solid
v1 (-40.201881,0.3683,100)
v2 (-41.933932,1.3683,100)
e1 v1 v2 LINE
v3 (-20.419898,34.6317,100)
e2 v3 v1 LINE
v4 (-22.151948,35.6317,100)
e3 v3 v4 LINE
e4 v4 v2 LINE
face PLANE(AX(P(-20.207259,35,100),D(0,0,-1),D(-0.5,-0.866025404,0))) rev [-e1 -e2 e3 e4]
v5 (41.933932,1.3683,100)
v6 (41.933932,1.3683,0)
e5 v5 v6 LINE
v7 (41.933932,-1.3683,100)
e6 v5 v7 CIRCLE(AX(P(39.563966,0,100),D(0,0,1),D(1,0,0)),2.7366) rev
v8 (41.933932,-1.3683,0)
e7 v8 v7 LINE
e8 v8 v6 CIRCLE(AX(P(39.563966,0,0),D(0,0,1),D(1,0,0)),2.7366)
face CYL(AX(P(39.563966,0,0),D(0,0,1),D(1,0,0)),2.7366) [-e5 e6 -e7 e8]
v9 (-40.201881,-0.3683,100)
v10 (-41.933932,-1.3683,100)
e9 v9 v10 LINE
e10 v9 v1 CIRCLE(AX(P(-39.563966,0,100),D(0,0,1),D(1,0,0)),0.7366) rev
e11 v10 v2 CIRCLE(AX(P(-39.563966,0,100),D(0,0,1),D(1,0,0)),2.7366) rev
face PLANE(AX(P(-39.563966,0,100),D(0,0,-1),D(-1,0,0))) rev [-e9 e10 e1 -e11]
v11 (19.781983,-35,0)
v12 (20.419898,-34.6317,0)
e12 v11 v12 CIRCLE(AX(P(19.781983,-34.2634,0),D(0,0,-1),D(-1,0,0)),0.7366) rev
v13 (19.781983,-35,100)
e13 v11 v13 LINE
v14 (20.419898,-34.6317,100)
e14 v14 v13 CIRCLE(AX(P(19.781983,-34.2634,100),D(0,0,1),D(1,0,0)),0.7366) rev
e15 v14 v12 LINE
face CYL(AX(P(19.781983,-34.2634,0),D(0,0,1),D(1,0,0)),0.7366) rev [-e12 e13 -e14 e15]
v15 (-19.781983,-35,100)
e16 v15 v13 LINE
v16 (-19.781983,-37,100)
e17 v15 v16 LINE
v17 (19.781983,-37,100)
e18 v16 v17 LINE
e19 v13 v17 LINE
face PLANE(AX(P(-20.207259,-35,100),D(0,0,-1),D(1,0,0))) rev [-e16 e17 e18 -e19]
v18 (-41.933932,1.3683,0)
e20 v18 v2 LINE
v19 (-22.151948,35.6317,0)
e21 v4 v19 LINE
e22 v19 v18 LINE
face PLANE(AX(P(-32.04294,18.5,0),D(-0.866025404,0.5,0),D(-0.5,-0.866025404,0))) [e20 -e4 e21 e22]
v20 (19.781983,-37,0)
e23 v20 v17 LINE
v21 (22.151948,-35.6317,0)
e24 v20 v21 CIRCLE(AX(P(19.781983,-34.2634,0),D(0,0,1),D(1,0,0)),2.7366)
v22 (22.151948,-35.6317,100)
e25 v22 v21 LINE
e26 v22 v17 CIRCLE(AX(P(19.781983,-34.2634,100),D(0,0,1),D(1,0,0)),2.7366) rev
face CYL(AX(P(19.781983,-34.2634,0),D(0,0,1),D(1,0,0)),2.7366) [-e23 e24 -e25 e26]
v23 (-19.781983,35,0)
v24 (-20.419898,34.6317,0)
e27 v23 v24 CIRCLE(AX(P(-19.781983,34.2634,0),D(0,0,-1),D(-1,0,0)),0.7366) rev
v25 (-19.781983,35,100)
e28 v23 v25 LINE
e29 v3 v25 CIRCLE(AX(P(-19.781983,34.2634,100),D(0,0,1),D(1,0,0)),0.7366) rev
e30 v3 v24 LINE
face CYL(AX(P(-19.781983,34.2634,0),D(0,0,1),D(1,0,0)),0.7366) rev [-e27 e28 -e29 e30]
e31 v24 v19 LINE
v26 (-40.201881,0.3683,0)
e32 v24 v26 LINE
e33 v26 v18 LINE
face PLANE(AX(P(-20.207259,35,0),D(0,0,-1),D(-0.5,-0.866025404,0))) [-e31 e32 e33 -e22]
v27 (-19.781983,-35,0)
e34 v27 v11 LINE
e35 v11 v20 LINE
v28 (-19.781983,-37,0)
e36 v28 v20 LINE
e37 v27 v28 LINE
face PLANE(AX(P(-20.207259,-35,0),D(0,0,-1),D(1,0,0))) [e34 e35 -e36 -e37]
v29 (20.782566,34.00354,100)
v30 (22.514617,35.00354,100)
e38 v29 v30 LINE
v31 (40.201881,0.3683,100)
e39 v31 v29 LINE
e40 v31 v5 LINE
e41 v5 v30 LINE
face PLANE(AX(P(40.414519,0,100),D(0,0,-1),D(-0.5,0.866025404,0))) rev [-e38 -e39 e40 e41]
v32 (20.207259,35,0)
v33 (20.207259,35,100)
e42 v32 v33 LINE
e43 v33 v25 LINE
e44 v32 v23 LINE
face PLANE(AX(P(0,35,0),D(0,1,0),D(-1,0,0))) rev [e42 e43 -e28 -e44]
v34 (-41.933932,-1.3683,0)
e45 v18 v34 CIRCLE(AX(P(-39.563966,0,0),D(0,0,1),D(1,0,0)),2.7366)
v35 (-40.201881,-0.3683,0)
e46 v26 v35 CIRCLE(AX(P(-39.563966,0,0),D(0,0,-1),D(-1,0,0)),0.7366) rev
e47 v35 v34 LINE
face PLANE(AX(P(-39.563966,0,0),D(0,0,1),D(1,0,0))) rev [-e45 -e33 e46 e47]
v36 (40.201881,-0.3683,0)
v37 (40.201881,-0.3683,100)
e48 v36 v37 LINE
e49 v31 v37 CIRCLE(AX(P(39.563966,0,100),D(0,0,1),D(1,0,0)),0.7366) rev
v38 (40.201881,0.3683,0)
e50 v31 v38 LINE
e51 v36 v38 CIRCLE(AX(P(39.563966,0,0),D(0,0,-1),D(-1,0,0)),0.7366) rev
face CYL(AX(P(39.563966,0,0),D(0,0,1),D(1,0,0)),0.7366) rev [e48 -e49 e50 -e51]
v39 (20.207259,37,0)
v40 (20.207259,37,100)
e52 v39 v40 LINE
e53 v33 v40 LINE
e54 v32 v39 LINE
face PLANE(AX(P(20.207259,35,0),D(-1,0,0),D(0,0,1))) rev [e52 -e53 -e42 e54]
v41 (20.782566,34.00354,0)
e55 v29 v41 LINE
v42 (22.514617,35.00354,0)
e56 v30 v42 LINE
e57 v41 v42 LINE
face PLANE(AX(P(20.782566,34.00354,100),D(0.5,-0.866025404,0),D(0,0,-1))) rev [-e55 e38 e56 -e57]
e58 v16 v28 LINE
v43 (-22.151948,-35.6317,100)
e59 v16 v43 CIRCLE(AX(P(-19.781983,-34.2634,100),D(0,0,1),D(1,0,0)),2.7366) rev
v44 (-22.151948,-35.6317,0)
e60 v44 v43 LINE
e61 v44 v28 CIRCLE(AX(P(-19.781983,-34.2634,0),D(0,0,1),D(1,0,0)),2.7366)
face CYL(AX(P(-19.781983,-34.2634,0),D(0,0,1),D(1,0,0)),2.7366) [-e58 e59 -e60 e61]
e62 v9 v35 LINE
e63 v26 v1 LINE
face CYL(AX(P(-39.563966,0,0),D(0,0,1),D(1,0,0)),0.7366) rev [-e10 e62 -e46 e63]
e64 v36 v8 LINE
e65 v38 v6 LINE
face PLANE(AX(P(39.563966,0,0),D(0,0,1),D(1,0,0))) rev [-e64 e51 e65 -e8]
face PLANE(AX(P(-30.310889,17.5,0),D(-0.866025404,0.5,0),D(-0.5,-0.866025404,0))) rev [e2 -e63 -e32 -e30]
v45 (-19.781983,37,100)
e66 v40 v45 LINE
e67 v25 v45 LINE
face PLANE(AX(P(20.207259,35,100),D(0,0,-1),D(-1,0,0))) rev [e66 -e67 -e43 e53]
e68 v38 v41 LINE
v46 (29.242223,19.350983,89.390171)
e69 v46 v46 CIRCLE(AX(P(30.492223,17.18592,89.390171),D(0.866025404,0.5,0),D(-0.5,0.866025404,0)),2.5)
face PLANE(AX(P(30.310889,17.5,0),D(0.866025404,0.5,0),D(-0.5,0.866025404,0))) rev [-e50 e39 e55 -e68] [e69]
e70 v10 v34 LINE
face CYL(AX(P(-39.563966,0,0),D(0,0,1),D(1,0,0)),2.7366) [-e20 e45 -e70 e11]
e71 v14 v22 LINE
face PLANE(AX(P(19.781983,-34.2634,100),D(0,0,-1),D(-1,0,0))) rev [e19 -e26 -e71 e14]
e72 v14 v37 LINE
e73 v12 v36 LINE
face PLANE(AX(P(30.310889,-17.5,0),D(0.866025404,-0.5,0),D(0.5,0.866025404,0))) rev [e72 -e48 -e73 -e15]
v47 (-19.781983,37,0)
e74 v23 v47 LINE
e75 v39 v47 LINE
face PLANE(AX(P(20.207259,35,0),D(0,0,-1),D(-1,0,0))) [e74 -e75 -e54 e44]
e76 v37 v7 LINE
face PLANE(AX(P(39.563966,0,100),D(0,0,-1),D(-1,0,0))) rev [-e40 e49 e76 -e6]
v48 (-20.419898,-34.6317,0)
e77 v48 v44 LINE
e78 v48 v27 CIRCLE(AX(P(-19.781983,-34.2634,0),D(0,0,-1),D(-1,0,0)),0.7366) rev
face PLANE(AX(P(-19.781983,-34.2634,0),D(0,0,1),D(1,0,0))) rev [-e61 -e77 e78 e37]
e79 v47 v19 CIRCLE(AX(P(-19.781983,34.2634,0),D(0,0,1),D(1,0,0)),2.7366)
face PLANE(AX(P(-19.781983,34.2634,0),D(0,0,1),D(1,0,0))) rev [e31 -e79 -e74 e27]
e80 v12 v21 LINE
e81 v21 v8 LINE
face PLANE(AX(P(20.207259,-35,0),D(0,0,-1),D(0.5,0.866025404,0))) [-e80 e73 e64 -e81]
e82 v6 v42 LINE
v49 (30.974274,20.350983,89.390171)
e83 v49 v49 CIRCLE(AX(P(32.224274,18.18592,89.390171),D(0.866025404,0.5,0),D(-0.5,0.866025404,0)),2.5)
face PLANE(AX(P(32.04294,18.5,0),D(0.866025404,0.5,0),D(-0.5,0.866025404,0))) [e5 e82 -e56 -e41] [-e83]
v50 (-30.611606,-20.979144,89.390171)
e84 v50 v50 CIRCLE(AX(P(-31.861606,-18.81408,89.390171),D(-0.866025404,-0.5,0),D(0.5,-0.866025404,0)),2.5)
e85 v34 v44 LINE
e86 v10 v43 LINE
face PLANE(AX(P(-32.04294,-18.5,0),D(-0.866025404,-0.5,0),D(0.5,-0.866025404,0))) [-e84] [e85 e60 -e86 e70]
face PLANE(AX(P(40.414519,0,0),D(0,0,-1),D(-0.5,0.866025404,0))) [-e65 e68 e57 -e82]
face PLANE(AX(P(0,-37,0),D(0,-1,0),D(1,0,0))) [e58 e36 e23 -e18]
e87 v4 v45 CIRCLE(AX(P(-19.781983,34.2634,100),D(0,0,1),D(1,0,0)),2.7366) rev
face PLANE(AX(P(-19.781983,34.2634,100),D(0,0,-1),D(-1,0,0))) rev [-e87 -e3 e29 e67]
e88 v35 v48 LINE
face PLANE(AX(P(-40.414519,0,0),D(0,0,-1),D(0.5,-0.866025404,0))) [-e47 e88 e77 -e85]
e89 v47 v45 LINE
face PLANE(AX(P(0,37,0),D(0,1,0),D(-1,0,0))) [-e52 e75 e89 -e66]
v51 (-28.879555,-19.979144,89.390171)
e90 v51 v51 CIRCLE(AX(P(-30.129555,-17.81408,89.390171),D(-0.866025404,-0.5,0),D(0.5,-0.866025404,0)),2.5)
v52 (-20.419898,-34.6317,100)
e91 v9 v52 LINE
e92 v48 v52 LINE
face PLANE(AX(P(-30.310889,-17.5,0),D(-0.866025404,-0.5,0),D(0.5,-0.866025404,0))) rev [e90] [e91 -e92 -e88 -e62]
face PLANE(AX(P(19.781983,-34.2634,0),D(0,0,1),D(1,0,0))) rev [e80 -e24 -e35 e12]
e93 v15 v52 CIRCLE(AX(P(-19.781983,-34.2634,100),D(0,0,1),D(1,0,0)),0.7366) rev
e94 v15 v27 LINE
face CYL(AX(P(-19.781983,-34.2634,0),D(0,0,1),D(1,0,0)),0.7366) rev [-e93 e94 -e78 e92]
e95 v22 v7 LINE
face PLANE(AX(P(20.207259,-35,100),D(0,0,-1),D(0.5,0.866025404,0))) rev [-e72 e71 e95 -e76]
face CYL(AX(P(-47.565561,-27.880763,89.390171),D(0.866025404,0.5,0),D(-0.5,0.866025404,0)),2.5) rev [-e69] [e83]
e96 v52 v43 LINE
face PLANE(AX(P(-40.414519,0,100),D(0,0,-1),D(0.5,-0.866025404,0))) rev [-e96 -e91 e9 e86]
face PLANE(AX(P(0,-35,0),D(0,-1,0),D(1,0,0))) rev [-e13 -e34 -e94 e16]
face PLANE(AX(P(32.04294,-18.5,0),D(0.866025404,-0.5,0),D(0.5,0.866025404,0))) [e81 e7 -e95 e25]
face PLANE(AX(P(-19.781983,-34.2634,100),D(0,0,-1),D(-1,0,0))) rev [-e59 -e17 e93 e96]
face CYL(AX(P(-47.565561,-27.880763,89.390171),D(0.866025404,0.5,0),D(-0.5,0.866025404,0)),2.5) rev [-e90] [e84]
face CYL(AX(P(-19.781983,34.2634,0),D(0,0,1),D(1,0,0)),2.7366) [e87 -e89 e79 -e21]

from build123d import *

# Parameters (mm, degrees)
LOFTED_BENDS1_DEPTH = 100
SKETCH11_R          = 2.5
CUT_EXTRUDE1_DEPTH  = 137.408236331


# Read off the part's stored shape, not the designer's step: Lofted Bends1
with BuildPart() as part:
    # Lofted Bends1 outline → Lofted Bends1 (new body)
    with BuildSketch(Plane.XY):
        with BuildLine():
            Line((20.207259422, 35), (20.207259422, 37))
            Line((20.207259422, 37), (-19.781983213, 37))
            ThreePointArc((-19.781983213, 37), (-21.150283213, 36.63336512), (-22.151948333, 35.6317))
            Line((-22.151948333, 35.6317), (-41.933931547, 1.3683))
            ThreePointArc((-41.933931547, 1.3683), (-42.300566427, 0), (-41.933931547, -1.3683))
            Line((-41.933931547, -1.3683), (-22.151948333, -35.6317))
            ThreePointArc((-22.151948333, -35.6317), (-21.150283213, -36.63336512), (-19.781983213, -37))
            Line((-19.781983213, -37), (19.781983213, -37))
            ThreePointArc((19.781983213, -37), (21.150283213, -36.63336512), (22.151948333, -35.6317))
            Line((22.151948333, -35.6317), (41.933931547, -1.3683))
            ThreePointArc((41.933931547, -1.3683), (42.300566427, 0), (41.933931547, 1.3683))
            Line((41.933931547, 1.3683), (22.514616839, 35.003539722))
            Line((22.514616839, 35.003539722), (20.782566032, 34.003539722))
            Line((20.782566032, 34.003539722), (40.201880739, 0.3683))
            ThreePointArc((40.201880739, 0.3683), (40.300566427, 0), (40.201880739, -0.3683))
            Line((40.201880739, -0.3683), (20.419897526, -34.6317))
            ThreePointArc((20.419897526, -34.6317), (20.150283213, -34.901314312), (19.781983213, -35))
            Line((19.781983213, -35), (-19.781983213, -35))
            ThreePointArc((-19.781983213, -35), (-20.150283213, -34.901314312), (-20.419897526, -34.6317))
            Line((-20.419897526, -34.6317), (-40.201880739, -0.3683))
            ThreePointArc((-40.201880739, -0.3683), (-40.300566427, 0), (-40.201880739, 0.3683))
            Line((-40.201880739, 0.3683), (-20.419897526, 34.6317))
            ThreePointArc((-20.419897526, 34.6317), (-20.150283213, 34.901314312), (-19.781983213, 35))
            Line((-19.781983213, 35), (20.207259422, 35))
        make_face()
    extrude(amount=LOFTED_BENDS1_DEPTH)

    # Sketch11 → Cut-Extrude1 (cut, through all)
    with BuildSketch(Plane(origin=(32.04293994, 18.5, 0), x_dir=(0, 0, -1), z_dir=(0.8660254037844385, 0.5000000000000004, 0))):
        with Locations(Location((-89.390171196, -0.362668506, 0), (0, 0, 270))):
            Circle(SKETCH11_R)
    extrude(amount=-CUT_EXTRUDE1_DEPTH, mode=Mode.SUBTRACT)


solid = part.part
